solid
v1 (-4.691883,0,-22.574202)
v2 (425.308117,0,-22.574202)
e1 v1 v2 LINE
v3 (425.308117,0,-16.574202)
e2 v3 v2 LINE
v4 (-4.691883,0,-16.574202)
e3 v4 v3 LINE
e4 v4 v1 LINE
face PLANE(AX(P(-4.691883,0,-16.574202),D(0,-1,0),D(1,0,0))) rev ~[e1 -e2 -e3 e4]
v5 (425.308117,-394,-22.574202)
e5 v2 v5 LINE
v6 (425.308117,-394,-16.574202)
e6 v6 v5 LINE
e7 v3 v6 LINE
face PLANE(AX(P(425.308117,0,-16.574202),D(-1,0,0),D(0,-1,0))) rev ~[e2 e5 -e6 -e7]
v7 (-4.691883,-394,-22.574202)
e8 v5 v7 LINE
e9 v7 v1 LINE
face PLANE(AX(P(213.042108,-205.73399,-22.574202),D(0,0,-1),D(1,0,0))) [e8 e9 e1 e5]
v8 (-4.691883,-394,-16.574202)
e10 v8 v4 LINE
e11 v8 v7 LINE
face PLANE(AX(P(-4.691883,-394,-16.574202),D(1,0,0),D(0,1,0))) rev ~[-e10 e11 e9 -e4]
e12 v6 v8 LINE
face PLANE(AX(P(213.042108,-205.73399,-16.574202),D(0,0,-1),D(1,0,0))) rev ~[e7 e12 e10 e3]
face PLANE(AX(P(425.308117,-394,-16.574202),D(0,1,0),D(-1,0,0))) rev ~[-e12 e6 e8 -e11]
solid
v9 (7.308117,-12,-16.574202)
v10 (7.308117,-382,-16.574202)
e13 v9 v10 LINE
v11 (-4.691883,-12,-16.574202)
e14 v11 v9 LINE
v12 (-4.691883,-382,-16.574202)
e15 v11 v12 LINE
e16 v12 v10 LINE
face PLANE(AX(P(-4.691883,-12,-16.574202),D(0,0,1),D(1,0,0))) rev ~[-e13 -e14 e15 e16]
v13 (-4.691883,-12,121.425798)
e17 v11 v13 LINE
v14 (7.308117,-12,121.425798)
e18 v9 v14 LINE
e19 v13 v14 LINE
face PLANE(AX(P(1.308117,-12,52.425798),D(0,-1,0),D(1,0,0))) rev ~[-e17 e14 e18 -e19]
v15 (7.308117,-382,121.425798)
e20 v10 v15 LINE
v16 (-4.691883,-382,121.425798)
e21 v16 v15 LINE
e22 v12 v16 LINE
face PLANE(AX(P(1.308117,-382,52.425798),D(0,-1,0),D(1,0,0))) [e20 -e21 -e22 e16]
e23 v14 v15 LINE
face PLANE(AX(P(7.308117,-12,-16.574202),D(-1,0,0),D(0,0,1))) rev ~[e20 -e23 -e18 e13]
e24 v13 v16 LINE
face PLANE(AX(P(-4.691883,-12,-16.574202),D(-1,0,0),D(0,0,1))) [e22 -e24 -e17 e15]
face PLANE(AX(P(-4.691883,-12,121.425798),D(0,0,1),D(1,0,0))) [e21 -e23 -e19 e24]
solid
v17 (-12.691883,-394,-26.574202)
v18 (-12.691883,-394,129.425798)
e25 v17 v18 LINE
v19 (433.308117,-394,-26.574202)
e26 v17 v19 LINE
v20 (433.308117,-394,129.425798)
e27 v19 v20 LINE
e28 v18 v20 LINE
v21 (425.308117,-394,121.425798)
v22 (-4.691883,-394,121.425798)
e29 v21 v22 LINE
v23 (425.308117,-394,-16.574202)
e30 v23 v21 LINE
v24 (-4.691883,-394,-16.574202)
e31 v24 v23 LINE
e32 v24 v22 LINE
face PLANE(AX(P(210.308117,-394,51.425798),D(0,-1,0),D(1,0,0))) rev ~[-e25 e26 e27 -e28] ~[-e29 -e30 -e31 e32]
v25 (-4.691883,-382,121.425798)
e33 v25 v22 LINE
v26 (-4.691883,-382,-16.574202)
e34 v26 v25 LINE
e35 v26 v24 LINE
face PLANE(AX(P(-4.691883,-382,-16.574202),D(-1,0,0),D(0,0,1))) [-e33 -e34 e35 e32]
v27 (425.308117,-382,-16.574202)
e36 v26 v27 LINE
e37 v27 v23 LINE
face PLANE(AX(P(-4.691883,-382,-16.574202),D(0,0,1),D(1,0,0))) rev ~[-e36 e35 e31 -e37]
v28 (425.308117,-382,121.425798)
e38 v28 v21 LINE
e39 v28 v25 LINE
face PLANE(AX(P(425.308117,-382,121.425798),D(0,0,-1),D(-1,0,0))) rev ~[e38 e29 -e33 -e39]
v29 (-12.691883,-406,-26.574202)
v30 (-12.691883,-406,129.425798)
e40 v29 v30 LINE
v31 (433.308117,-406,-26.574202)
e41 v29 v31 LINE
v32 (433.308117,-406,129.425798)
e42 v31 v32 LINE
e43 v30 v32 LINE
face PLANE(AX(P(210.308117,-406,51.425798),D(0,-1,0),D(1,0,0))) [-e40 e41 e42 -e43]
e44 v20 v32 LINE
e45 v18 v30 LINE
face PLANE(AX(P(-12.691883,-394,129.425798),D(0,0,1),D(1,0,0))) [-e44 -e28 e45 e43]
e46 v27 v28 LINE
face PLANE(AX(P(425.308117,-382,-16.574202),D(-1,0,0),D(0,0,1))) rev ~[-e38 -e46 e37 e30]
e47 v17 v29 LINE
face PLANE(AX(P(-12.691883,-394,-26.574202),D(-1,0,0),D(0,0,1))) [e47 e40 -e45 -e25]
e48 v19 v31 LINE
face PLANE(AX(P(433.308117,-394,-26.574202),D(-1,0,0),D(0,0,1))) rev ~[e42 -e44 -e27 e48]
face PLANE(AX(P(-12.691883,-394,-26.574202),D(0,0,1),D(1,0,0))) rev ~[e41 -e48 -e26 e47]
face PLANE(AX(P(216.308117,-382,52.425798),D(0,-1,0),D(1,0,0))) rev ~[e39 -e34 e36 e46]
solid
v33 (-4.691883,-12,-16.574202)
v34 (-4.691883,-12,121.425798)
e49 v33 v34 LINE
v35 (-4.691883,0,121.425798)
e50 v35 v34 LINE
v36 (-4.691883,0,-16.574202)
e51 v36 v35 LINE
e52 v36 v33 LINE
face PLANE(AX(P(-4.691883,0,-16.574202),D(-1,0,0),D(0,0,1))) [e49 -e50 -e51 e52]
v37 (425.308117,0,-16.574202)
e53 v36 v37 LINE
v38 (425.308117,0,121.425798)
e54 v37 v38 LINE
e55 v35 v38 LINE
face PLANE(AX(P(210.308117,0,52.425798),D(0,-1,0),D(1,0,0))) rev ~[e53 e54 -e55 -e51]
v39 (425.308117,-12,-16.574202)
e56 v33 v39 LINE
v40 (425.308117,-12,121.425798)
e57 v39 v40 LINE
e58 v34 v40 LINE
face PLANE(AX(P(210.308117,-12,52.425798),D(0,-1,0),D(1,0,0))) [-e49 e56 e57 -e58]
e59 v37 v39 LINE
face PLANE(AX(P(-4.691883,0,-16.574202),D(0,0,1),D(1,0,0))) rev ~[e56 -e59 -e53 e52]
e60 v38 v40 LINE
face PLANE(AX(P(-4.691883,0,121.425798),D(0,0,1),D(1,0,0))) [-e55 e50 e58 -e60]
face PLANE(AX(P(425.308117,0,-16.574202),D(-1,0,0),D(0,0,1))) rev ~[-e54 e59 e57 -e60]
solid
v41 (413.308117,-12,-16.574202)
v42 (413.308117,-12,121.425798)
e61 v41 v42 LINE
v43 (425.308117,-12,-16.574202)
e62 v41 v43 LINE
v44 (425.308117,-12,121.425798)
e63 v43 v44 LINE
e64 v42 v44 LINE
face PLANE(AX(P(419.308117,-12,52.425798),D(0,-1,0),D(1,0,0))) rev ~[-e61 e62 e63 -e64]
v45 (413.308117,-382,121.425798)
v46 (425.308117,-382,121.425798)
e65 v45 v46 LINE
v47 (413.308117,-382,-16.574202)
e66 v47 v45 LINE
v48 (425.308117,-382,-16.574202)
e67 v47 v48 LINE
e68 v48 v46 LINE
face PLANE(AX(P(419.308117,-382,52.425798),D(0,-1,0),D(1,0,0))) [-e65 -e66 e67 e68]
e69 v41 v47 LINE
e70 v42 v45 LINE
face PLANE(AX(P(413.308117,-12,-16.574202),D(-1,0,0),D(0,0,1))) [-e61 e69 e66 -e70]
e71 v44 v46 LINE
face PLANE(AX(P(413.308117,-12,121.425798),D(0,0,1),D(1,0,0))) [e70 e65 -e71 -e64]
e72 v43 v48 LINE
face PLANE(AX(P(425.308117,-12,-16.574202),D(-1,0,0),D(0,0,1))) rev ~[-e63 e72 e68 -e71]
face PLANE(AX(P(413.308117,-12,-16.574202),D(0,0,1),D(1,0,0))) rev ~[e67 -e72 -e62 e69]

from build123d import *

# Parameters (mm, degrees)
F0_W     = 430
F0_H     = 138
F1_DEPTH = 12
F2_W     = 12
F2_H     = 138
F3_DEPTH = 370
F4_W     = 418
F4_H     = 138
F4_W_2   = 12
F5_DEPTH = 12
F6_W     = 12
F6_H     = 370
F7_DEPTH = 6
F8_W     = 446
F8_H     = 156
F8_W_2   = 430
F8_H_2   = 138
F9_DEPTH = 12


with BuildPart() as f1:
    # F0 (on Front) → F1 (new body)
    with BuildSketch(Plane.XZ):
        with Locations((210.308117494, 52.4257982135)):
            Rectangle(F0_W, F0_H)
    extrude(amount=F1_DEPTH)


with BuildPart() as f3:
    # F2 (on face) → F3 (new body)
    with BuildSketch(Plane.XZ.offset(12)):
        with Locations((1.308117494, 52.4257982135)):
            Rectangle(F2_W, F2_H)
    extrude(amount=F3_DEPTH)


with BuildPart() as f3b:
    # F2 (on face) → F3, piece 2 (new body)
    with BuildSketch(Plane.XZ.offset(12)):
        with Locations((419.308117494, 52.4257982135)):
            Rectangle(F2_W, F2_H)
    extrude(amount=F3_DEPTH)


with BuildPart() as f5:
    # F4 (on face) → F5 (new body)
    with BuildSketch(Plane.XZ.offset(382)):
        with Locations((216.308117494, 52.4257982135)):
            Rectangle(F4_W, F4_H)
        with Locations((1.308117494, 52.4257982135)):
            Rectangle(F4_W_2, F4_H)
    extrude(amount=F5_DEPTH)

    # F8 (on face) → F9 (join)
    with BuildSketch(Plane.XZ.offset(394)):
        with Locations((210.308117494, 51.4257982135)):
            Rectangle(F8_W, F8_H)
        with Locations((210.308117494, 52.4257982135)):
            Rectangle(F8_W_2, F8_H_2, mode=Mode.SUBTRACT)
        with Locations((210.308117494, 52.4257982135)):
            Rectangle(F8_W_2, F8_H_2)
    extrude(amount=F9_DEPTH)


with BuildPart() as f7:
    # F6 (on face) → F7 (new body)
    with BuildSketch(Plane(origin=(0, 0, -16.5742017865), x_dir=(1, 0, 0), z_dir=(0, 0, -1))):
        Polygon((425.308117494, 394), (-4.691882506, 394), (-4.691882506, 382), (7.308117494, 382), (7.308117494, 12), (425.308117494, 12), align=None)
        with Locations((1.308117494, 197)):
            Rectangle(F6_W, F6_H)
        Polygon((425.308117494, 0), (425.308117494, 12), (7.308117494, 12), (-4.691882506, 12), (-4.691882506, 0), align=None)
    extrude(amount=F7_DEPTH)


solid = Compound([f1.part, f3.part, f3b.part, f5.part, f7.part])
